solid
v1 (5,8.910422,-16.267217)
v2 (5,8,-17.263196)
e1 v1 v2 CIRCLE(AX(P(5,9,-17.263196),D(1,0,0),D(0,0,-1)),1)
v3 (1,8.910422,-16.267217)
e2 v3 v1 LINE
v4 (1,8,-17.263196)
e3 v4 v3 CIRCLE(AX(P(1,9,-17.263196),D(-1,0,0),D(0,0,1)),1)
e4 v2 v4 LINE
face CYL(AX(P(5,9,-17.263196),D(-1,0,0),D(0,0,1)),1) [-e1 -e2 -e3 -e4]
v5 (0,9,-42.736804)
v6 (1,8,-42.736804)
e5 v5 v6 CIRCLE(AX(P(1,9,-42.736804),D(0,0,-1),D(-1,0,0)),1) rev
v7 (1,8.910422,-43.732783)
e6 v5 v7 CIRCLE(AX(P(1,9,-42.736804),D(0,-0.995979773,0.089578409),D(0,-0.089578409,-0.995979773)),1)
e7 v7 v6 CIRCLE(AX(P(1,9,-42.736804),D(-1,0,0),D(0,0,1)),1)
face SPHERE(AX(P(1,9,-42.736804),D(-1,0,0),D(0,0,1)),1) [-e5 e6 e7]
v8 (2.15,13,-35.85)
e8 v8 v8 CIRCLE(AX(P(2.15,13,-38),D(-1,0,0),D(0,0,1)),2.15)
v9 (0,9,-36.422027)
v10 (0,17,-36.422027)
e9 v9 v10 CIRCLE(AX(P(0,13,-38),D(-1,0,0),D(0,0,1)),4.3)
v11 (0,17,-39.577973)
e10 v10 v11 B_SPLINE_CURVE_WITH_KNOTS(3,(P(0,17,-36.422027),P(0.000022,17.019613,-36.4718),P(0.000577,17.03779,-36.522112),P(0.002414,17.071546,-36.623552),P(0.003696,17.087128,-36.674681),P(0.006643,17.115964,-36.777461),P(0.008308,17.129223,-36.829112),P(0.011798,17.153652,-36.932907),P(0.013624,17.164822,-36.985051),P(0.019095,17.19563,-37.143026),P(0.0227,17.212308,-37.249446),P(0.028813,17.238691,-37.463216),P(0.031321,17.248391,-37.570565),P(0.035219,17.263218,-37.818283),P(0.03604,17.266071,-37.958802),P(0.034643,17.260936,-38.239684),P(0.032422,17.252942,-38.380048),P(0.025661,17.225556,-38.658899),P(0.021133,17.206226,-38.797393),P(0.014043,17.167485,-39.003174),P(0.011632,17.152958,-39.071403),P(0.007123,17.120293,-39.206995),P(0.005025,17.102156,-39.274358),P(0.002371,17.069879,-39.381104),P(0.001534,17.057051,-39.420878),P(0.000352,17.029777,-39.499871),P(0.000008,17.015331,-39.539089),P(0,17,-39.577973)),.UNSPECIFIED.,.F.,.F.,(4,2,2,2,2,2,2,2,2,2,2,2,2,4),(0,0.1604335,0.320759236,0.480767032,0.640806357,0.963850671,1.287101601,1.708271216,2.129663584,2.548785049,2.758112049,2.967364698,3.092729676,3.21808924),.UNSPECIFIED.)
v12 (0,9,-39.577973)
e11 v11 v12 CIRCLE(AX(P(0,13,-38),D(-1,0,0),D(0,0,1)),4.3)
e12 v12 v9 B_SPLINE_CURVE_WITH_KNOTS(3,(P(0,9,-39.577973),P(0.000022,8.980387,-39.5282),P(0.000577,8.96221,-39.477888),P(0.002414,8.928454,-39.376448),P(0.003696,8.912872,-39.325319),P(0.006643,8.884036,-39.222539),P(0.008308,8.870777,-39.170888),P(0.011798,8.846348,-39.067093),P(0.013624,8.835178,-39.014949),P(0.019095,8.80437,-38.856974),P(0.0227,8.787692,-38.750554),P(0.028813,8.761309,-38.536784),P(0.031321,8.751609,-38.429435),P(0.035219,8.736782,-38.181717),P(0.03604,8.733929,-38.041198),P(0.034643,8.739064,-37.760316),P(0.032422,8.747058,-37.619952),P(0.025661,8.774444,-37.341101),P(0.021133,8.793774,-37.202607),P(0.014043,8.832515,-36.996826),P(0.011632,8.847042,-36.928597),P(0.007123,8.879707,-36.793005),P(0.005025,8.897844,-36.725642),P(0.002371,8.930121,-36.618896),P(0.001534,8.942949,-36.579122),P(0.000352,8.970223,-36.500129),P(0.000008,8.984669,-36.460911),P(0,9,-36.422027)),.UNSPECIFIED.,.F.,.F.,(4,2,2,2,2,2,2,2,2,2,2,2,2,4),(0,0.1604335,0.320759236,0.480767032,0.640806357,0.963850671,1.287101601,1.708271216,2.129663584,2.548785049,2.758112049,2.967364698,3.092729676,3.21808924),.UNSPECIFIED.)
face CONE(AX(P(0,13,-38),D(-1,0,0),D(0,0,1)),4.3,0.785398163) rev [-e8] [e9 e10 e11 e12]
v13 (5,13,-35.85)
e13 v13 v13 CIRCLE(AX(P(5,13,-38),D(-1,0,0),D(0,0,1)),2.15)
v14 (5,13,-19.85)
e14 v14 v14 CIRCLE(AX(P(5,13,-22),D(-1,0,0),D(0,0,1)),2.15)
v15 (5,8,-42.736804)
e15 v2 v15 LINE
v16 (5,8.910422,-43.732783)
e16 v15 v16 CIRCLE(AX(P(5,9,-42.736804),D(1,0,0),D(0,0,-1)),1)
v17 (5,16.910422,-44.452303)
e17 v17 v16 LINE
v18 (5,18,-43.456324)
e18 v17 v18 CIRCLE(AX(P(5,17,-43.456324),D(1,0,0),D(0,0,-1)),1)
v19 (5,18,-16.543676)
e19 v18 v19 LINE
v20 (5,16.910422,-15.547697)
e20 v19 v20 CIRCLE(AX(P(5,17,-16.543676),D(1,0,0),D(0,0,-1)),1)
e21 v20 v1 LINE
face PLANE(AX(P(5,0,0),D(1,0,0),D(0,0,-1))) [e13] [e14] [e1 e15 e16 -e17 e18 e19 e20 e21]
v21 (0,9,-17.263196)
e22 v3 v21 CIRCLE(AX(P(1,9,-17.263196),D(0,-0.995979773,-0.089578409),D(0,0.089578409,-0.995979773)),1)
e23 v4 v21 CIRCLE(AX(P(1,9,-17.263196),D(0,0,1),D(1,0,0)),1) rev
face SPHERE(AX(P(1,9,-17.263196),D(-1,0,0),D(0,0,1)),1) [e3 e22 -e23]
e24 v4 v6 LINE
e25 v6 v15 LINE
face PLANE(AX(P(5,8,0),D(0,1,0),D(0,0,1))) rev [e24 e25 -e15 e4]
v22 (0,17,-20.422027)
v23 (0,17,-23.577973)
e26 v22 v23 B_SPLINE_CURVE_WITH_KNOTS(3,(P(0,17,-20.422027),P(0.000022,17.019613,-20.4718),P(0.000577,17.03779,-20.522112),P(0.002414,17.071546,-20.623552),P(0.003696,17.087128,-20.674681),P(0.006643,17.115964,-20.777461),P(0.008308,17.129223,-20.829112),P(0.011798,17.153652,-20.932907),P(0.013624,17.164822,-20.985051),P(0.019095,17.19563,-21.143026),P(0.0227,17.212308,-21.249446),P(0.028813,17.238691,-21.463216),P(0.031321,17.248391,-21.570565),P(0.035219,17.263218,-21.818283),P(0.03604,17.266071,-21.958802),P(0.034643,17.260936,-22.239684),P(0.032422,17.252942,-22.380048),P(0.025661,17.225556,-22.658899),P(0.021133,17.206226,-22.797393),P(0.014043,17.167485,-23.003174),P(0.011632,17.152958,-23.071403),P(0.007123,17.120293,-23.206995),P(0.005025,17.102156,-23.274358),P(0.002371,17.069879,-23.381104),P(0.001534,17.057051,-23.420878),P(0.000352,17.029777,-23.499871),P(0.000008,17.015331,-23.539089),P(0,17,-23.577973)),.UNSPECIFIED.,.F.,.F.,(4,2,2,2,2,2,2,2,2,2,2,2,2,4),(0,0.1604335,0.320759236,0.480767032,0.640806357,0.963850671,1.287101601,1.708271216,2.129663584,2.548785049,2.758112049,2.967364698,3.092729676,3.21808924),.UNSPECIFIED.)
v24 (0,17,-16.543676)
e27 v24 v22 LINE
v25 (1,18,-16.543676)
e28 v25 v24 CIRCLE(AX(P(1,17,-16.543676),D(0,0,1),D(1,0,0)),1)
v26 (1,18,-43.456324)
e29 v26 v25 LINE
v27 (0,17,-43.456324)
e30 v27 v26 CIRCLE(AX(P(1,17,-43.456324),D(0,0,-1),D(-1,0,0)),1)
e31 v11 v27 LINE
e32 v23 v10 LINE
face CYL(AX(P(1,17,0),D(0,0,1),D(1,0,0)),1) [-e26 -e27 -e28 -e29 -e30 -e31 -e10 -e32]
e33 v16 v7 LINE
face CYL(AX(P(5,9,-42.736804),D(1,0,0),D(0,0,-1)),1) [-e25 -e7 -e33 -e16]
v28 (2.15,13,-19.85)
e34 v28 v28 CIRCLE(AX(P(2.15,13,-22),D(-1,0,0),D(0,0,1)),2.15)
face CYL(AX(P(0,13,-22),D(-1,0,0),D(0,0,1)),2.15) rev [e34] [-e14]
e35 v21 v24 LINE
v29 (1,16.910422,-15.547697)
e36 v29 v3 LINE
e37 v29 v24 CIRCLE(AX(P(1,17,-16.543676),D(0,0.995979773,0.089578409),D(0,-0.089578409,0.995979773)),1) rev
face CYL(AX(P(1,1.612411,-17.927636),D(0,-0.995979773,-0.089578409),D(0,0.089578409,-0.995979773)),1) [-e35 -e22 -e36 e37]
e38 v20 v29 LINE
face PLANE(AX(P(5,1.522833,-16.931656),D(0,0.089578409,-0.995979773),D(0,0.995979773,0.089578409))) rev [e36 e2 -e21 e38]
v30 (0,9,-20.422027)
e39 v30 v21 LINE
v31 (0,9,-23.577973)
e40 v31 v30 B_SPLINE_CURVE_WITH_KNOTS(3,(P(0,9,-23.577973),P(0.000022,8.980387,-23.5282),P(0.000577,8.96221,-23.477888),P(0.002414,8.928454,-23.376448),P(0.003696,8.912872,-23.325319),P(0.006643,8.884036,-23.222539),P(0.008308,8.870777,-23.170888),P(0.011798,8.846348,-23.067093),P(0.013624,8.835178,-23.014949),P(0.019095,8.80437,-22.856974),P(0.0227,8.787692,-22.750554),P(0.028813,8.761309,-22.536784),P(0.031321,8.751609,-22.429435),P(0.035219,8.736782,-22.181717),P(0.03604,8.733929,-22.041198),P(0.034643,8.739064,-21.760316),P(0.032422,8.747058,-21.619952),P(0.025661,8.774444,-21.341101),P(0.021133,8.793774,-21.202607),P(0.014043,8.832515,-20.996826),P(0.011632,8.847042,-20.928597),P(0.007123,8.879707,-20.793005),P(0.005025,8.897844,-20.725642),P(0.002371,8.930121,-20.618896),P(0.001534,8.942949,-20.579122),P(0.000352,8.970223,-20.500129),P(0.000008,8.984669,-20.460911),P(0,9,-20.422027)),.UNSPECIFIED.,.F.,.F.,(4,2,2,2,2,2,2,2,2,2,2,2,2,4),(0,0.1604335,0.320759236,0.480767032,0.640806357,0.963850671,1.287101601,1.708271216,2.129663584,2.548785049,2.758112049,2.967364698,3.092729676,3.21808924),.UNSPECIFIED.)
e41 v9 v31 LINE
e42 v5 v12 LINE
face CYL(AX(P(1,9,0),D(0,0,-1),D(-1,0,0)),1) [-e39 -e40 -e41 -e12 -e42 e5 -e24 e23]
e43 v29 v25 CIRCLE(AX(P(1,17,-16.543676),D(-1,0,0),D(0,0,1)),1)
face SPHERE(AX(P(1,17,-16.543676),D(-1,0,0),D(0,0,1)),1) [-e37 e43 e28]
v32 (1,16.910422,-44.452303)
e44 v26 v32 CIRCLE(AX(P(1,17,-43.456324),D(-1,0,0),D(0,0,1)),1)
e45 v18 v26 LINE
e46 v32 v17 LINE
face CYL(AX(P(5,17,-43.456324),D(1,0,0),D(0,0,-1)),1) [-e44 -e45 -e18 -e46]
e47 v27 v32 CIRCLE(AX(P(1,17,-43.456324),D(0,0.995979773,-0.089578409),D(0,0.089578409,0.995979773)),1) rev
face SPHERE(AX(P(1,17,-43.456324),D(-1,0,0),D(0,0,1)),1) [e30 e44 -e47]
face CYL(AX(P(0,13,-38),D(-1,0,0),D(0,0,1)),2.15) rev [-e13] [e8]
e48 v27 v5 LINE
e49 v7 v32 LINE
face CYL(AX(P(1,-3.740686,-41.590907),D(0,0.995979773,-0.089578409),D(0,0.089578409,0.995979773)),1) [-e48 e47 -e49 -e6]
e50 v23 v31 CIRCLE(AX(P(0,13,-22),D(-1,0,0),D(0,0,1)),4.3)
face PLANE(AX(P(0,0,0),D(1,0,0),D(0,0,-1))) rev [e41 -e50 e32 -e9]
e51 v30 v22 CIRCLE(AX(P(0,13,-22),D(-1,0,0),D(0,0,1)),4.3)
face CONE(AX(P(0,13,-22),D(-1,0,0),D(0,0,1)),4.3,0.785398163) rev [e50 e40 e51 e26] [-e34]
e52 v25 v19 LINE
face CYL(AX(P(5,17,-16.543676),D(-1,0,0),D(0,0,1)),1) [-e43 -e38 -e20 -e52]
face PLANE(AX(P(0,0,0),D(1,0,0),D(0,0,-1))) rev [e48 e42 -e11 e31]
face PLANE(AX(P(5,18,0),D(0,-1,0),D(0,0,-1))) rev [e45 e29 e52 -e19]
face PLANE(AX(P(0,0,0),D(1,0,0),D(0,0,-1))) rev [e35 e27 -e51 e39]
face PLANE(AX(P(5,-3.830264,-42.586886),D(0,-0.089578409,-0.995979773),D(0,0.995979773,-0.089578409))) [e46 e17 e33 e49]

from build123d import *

# Parameters (mm, degrees)
EXTRUDE_1_DEPTH              = 5
HOLE_WIZARD_M4_1_D           = 4.3
HOLE_WIZARD_M4_1_CSINK_D     = 8.6
HOLE_WIZARD_M4_1_CSINK_ANGLE = 90
FILLET_1_R                   = 1


with BuildPart() as part:
    # 草图1 → 凸台-拉伸1 (new body)
    with BuildSketch(Plane(origin=(0, 0, 0), x_dir=(0, 0, -1), z_dir=(1, 0, 0))):
        Polygon((22, 18), (15.44969994, 18), (16.349099819, 8), (43.650900181, 8), (44.55030006, 18), (38, 18), align=None)
    extrude(amount=EXTRUDE_1_DEPTH)

    # M4 十字槽沉头木螺钉的锥形沉头孔1 (through all)
    with Locations(Plane.ZY):
        with Locations((-38, 13), (-22, 13)):
            CounterSinkHole(HOLE_WIZARD_M4_1_D / 2, HOLE_WIZARD_M4_1_CSINK_D / 2, counter_sink_angle=HOLE_WIZARD_M4_1_CSINK_ANGLE)

    # 圆角1
    # the kernel refuses this fillet: 1 mm, written as the material it takes off along each edge
    with BuildSketch(Plane(origin=(1, 9, -17.263196285), x_dir=(0, -0.08957840876297431, 0.9959797732301061), z_dir=(-1, 0, 0))) as fillet_1_piece_1_section:
        Polygon((0, 0), (FILLET_1_R, 0), (FILLET_1_R, -FILLET_1_R * 0.914096466321), (FILLET_1_R * 0.089578408763, -FILLET_1_R * 0.99597977323), align=None)
    fillet_1_piece_1 = extrude(amount=FILLET_1_R, mode=Mode.PRIVATE)
    fillet_1_piece_1 = fillet_1_piece_1 - Plane(origin=(1, 9, -17.263196285), x_dir=(0, 0.7380983703961737, -0.6746931121765753), z_dir=(-1, 0, 0)) * Sphere(FILLET_1_R, mode=Mode.PRIVATE)
    add(fillet_1_piece_1, mode=Mode.SUBTRACT)
    with BuildSketch(Plane(origin=(1, 9, -42.736803715), x_dir=(0, -1, 0), z_dir=(-1, 0, 0))) as fillet_1_piece_2_section:
        Polygon((0, 0), (FILLET_1_R, 0), (FILLET_1_R, -FILLET_1_R * 0.914096466321), (FILLET_1_R * 0.089578408763, -FILLET_1_R * 0.99597977323), align=None)
    fillet_1_piece_2 = extrude(amount=FILLET_1_R, mode=Mode.PRIVATE)
    fillet_1_piece_2 = fillet_1_piece_2 - Plane(origin=(1, 9, -42.736803715), x_dir=(0, 0.7380983703961737, 0.6746931121765753), z_dir=(-1, 0, 0)) * Sphere(FILLET_1_R, mode=Mode.PRIVATE)
    add(fillet_1_piece_2, mode=Mode.SUBTRACT)
    with BuildSketch(Plane(origin=(1, 17, -16.543676382), x_dir=(0, -0.08957840876297431, 0.9959797732301061), z_dir=(-1, 0, 0))) as fillet_1_piece_3_section:
        Polygon((0, 0), (FILLET_1_R, 0), (FILLET_1_R, FILLET_1_R * 1.09397644214), (-FILLET_1_R * 0.089578408763, FILLET_1_R * 0.99597977323), align=None)
    fillet_1_piece_3 = extrude(amount=FILLET_1_R, mode=Mode.PRIVATE)
    fillet_1_piece_3 = fillet_1_piece_3 - Plane(origin=(1, 17, -16.543676382), x_dir=(0, -0.6746931121765753, -0.7380983703961737), z_dir=(-1, 0, 0)) * Sphere(FILLET_1_R, mode=Mode.PRIVATE)
    add(fillet_1_piece_3, mode=Mode.SUBTRACT)
    with BuildSketch(Plane(origin=(1, 17, -43.456323618), x_dir=(0, -0.08957840876297431, -0.9959797732301061), z_dir=(-1, 0, 0))) as fillet_1_piece_4_section:
        Polygon((0, 0), (FILLET_1_R, 0), (FILLET_1_R, -FILLET_1_R * 1.09397644214), (-FILLET_1_R * 0.089578408763, -FILLET_1_R * 0.99597977323), align=None)
    fillet_1_piece_4 = extrude(amount=FILLET_1_R, mode=Mode.PRIVATE)
    fillet_1_piece_4 = fillet_1_piece_4 - Plane(origin=(1, 17, -43.456323618), x_dir=(0, -0.6746931121765753, 0.7380983703961737), z_dir=(-1, 0, 0)) * Sphere(FILLET_1_R, mode=Mode.PRIVATE)
    add(fillet_1_piece_4, mode=Mode.SUBTRACT)
    with BuildSketch(Plane(origin=(0, 8, -17.263196285), x_dir=(1, 0, 0), z_dir=(0, 0, -1))) as fillet_1_piece_5:
        with BuildLine():
            CenterArc((FILLET_1_R, -FILLET_1_R), FILLET_1_R, 90, 90)
            Line((0, -FILLET_1_R), (0, 0))
            Line((0, 0), (FILLET_1_R, 0))
        make_face()
    extrude(amount=25.47360743, mode=Mode.SUBTRACT)
    with BuildSketch(Plane(origin=(0, 16.910421591, -15.547696608), x_dir=(0, 0.08957840876297431, -0.9959797732301061), z_dir=(0, -0.9959797732301061, -0.08957840876297431))) as fillet_1_piece_6:
        with BuildLine():
            CenterArc((FILLET_1_R, FILLET_1_R), FILLET_1_R, 180, 90)
            Line((0, FILLET_1_R), (0, 0))
            Line((0, 0), (FILLET_1_R, 0))
        make_face()
    extrude(amount=8.032291634, mode=Mode.SUBTRACT)
    with BuildSketch(Plane(origin=(0, 18, -43.456323618), x_dir=(1, 0, 0), z_dir=(0, 0, 1))) as fillet_1_piece_7:
        with BuildLine():
            CenterArc((FILLET_1_R, -FILLET_1_R), FILLET_1_R, 90, 90)
            Line((0, -FILLET_1_R), (0, 0))
            Line((0, 0), (FILLET_1_R, 0))
        make_face()
    extrude(amount=26.912647237, mode=Mode.SUBTRACT)
    with BuildSketch(Plane(origin=(0, 8.910421591, -43.732783488), x_dir=(1, 0, 0), z_dir=(0, 0.9959797732301061, -0.08957840876297431))) as fillet_1_piece_8:
        with BuildLine():
            CenterArc((FILLET_1_R, -FILLET_1_R), FILLET_1_R, 90, 90)
            Line((0, -FILLET_1_R), (0, 0))
            Line((0, 0), (FILLET_1_R, 0))
        make_face()
    extrude(amount=8.032291634, mode=Mode.SUBTRACT)
    with BuildSketch(Plane(origin=(1, 8, -43.650900181), x_dir=(0, 0, 1), z_dir=(1, 0, 0))) as fillet_1_piece_9:
        with BuildLine():
            CenterArc((FILLET_1_R * 0.914096466321, -FILLET_1_R), FILLET_1_R, 90, 84.860646272)
            Line((-FILLET_1_R * 0.0818833069089, -FILLET_1_R * 0.910421591237), (0, 0))
            Line((0, 0), (FILLET_1_R * 0.914096466321, 0))
        make_face()
    extrude(amount=6.285241166, mode=Mode.SUBTRACT)
    with BuildSketch(Plane(origin=(1, 8, -16.349099819), x_dir=(0, 0, -1), z_dir=(1, 0, 0))) as fillet_1_piece_10:
        with BuildLine():
            CenterArc((FILLET_1_R * 0.914096466321, FILLET_1_R), FILLET_1_R, 185.139353728, 84.860646272)
            Line((-FILLET_1_R * 0.0818833069089, FILLET_1_R * 0.910421591237), (0, 0))
            Line((0, 0), (FILLET_1_R * 0.914096466321, 0))
        make_face()
    extrude(amount=6.285241166, mode=Mode.SUBTRACT)
    with BuildSketch(Plane(origin=(1, 18, -15.44969994), x_dir=(0, 0, -1), z_dir=(1, 0, 0))) as fillet_1_piece_11:
        with BuildLine():
            CenterArc((FILLET_1_R * 1.09397644214, -FILLET_1_R), FILLET_1_R, 90, 95.139353728)
            Line((FILLET_1_R * 0.0979966689112, -FILLET_1_R * 1.08957840876), (0, 0))
            Line((0, 0), (FILLET_1_R * 1.09397644214, 0))
        make_face()
    extrude(amount=6.734941105, mode=Mode.SUBTRACT)
    with BuildSketch(Plane(origin=(1, 18, -44.55030006), x_dir=(0, 0, 1), z_dir=(1, 0, 0))) as fillet_1_piece_12:
        with BuildLine():
            CenterArc((FILLET_1_R * 1.09397644214, FILLET_1_R), FILLET_1_R, 174.860646272, 95.139353728)
            Line((FILLET_1_R * 0.0979966689112, FILLET_1_R * 1.08957840876), (0, 0))
            Line((0, 0), (FILLET_1_R * 1.09397644214, 0))
        make_face()
    extrude(amount=6.734941105, mode=Mode.SUBTRACT)


solid = part.part
